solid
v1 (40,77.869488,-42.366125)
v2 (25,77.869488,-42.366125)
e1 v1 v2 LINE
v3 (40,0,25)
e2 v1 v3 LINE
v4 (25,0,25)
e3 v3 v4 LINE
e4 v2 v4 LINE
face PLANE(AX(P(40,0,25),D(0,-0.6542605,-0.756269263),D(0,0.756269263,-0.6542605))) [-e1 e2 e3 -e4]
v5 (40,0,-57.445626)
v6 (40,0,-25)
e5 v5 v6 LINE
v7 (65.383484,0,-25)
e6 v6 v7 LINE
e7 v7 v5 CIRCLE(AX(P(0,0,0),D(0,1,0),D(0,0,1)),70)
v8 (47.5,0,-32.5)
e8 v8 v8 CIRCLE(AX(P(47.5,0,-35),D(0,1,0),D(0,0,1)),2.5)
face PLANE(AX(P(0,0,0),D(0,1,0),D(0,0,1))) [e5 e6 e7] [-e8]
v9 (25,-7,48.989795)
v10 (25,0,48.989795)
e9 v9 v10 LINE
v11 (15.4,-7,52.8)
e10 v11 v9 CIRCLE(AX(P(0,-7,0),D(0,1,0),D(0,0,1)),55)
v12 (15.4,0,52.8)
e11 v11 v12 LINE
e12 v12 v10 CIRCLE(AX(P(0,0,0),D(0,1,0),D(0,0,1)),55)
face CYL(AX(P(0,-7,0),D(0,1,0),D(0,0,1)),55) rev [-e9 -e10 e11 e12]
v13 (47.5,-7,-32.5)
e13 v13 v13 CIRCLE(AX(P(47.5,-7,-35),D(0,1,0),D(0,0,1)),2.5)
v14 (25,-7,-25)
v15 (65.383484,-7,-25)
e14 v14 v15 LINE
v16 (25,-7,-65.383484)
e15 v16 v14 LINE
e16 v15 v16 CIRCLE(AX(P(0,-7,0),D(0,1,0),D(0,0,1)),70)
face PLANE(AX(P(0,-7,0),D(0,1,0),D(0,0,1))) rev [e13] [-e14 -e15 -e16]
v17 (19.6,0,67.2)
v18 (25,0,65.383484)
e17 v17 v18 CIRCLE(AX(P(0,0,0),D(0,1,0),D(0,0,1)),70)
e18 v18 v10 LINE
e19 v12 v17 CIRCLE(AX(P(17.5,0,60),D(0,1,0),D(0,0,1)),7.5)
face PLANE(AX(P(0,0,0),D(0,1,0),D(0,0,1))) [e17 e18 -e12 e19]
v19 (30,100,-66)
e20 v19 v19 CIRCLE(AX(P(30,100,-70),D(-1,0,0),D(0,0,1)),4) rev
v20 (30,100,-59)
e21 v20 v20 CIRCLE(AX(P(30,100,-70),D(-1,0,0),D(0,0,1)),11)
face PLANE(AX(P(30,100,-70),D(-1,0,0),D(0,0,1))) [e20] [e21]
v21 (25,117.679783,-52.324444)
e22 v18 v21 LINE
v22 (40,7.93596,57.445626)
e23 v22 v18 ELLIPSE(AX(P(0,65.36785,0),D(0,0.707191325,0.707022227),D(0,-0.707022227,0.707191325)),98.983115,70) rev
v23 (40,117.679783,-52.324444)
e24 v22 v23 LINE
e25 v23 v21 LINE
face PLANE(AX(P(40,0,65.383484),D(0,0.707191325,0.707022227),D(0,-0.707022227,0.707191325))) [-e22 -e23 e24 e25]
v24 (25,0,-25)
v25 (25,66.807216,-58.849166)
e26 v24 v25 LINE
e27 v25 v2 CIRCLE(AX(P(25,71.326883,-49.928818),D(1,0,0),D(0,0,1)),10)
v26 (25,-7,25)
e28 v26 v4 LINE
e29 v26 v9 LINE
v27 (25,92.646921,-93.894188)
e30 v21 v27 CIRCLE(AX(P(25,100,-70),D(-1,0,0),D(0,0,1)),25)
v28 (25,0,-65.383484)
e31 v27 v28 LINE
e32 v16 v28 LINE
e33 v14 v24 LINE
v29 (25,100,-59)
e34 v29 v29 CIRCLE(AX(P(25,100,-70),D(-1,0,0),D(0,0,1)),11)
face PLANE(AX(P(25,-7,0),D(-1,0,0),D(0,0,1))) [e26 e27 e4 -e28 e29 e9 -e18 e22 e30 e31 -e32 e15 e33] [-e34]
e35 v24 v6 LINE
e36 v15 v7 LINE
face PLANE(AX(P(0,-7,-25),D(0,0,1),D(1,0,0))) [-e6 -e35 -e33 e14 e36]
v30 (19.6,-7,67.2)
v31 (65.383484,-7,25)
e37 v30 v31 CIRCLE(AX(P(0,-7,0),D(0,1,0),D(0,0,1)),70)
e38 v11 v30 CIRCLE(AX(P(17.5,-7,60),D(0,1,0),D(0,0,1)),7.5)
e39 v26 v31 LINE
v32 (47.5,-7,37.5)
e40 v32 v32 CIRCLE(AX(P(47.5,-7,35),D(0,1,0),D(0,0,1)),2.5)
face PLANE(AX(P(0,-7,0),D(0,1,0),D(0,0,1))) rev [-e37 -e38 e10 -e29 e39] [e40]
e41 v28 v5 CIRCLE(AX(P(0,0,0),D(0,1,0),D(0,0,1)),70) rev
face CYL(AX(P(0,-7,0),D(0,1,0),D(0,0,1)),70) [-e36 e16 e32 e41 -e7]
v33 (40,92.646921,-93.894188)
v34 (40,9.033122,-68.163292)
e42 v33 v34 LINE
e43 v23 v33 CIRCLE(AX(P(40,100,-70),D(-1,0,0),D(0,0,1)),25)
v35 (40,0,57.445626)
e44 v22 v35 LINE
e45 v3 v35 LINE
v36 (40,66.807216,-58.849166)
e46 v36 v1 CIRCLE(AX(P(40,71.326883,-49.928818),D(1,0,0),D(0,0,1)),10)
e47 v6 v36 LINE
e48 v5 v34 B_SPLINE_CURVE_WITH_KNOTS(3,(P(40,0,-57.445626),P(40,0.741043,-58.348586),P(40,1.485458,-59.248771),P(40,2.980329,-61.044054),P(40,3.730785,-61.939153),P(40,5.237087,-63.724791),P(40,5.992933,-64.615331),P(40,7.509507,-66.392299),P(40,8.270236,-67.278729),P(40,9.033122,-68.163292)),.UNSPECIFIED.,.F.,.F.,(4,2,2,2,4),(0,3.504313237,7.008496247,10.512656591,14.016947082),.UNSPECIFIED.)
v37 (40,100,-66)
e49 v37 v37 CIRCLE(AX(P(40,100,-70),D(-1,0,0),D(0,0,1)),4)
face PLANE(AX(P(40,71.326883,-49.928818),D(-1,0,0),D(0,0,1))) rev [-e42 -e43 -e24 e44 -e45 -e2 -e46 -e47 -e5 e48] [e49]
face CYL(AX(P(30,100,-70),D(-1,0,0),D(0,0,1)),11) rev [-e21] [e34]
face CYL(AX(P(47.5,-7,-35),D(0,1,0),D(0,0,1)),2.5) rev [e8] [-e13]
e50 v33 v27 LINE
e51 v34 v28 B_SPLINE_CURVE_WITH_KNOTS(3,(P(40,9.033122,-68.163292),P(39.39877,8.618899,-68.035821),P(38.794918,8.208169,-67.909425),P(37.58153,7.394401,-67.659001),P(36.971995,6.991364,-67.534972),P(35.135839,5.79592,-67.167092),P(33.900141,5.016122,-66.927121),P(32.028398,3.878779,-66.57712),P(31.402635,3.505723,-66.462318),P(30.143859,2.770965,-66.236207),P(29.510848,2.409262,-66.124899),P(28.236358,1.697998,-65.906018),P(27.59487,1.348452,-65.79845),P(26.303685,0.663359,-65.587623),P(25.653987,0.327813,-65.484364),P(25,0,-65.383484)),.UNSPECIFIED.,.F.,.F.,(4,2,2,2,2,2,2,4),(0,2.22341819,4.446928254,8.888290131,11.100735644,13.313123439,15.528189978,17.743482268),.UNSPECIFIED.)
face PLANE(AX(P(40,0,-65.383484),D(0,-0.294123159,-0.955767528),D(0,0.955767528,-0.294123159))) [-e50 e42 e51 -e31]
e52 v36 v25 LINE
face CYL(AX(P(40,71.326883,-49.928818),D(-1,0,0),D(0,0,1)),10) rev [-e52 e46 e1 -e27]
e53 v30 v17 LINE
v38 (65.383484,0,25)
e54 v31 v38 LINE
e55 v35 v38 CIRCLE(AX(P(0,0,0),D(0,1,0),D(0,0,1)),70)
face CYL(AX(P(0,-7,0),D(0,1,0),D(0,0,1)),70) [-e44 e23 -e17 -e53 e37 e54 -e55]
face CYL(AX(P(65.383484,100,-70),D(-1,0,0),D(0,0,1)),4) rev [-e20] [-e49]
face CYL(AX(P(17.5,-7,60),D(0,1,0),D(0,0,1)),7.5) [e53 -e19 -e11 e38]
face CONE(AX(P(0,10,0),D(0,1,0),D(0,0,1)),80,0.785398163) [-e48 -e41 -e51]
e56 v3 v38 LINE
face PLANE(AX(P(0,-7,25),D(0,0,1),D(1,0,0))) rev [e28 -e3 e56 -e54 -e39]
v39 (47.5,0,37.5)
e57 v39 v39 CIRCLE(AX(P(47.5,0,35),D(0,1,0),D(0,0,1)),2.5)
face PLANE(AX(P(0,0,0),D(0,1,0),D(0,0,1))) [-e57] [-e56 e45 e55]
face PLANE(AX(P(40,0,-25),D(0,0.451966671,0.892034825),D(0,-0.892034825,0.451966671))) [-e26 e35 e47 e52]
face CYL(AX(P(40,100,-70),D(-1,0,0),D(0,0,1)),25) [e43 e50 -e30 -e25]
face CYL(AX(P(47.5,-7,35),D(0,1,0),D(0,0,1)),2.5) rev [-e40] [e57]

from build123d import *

# Parameters (mm, degrees)
BOSS_EXTRUDE1_DEPTH   = 7
BOSS_EXTRUDE1_2_DEPTH = 7
BOSS_EXTRUDE2_DEPTH   = 15
CUT_EXTRUDE2_START    = 10
SKETCH3_R             = 92.486171345
SKETCH3_R_2           = 70
CUT_EXTRUDE2_DEPTH    = 10
CHAMFER2_SIZE         = 10
SKETCH4_R             = 4
CUT_EXTRUDE3_DEPTH    = 163.113620009
SKETCH5_R             = 11
CUT_EXTRUDE4_DEPTH    = 5
SKETCH6_R             = 2.5
CUT_EXTRUDE5_DEPTH    = 171.073513517
BOSS_EXTRUDE3_DEPTH   = 7


with BuildPart() as part:
    # Sketch1 → Boss-Extrude1 (new body)
    with BuildSketch(Plane(origin=(0, 0, 0), x_dir=(1, 0, 0), z_dir=(0, 1, 0))):
        with BuildLine():
            ThreePointArc((65.383484153, 25), (49.497474683, 49.497474683), (25, 65.383484153))
            Line((25, 65.383484153), (25, 25))
            Line((25, 25), (65.383484153, 25))
        make_face()
    extrude(amount=-BOSS_EXTRUDE1_DEPTH)



with BuildPart() as body_2:
    # Sketch1 → Boss-Extrude1 2 (new body)
    with BuildSketch(Plane(origin=(0, 0, 0), x_dir=(1, 0, 0), z_dir=(0, 1, 0))):
        with BuildLine():
            Line((25, -25), (25, -65.383484153))
            ThreePointArc((25, -65.383484153), (49.497474683, -49.497474683), (65.383484153, -25))
            Line((65.383484153, -25), (25, -25))
        make_face()
    extrude(amount=-BOSS_EXTRUDE1_2_DEPTH)


with BuildPart() as part_1:
    add(part.part)

    add(body_2.part)  # Boss-Extrude2 merges body 2
    # Sketch2 → Boss-Extrude2 (add)
    with BuildSketch(Plane.ZY.offset(-25)):
        with BuildLine():
            Line((-65.383484153, 0), (-93.894188194, 92.646921016))
            ThreePointArc((-93.894188194, 92.646921016), (-82.896855971, 121.416608183), (-52.324444318, 117.679783125))
            Line((-52.324444318, 117.679783125), (65.383484153, 0))
            Line((65.383484153, 0), (25, 0))
            Line((25, 0), (-42.366125313, 77.869487777))
            ThreePointArc((-42.366125313, 77.869487777), (-55.501453858, 79.630239272), (-58.849166194, 66.807216074))
            Line((-58.849166194, 66.807216074), (-25, 0))
            Line((-25, 0), (-65.383484153, 0))
        make_face()
    extrude(amount=-BOSS_EXTRUDE2_DEPTH)

    # Sketch3 → Cut-Extrude2 (cut)
    with BuildSketch(Plane(origin=(0, 0, 0), x_dir=(1, 0, 0), z_dir=(0, 1, 0)).offset(CUT_EXTRUDE2_START)):
        Circle(SKETCH3_R)
        Circle(SKETCH3_R_2, mode=Mode.SUBTRACT)
    extrude(amount=-CUT_EXTRUDE2_DEPTH, mode=Mode.SUBTRACT)

    # Chamfer2
    # the kernel refuses this chamfer: 10 mm, written as the material it adds along each edge
    with BuildSketch(Plane(origin=(0, 10, 0), x_dir=(0.8280566024533268, 0, -0.5606445069145448), z_dir=(0.5606445069145448, 0, 0.8280566024533268))) as chamfer2_piece_1_section:
        Polygon((70 + CHAMFER2_SIZE, 0), (70, -CHAMFER2_SIZE), (70, 0), align=None)
    chamfer2_piece_1 = revolve(axis=Axis((0, 10, 0), (0, 1, 0)), revolution_arc=56.024500162, mode=Mode.PRIVATE)
    chamfer2_piece_1 = split(chamfer2_piece_1, bisect_by=Plane(origin=(33.827146268, 0, -63.755868056), z_dir=(0, 1, 0)), keep=Keep.TOP, mode=Mode.PRIVATE)
    chamfer2_piece_1 = split(chamfer2_piece_1, bisect_by=Plane(origin=(40, 6.324094296, -63.755868056), z_dir=(-1, 0, 0)), keep=Keep.TOP, mode=Mode.PRIVATE)
    chamfer2_piece_1 = split(chamfer2_piece_1, bisect_by=Plane(origin=(33.827146268, 5.319462172, -67.020469063), z_dir=(0, 0.2941231593783912, 0.9557675277583318)), keep=Keep.TOP, mode=Mode.PRIVATE)
    chamfer2_piece_1 = split(chamfer2_piece_1, bisect_by=Plane(origin=(25, 6.324094296, -63.755868056), z_dir=(1, 0, 0)), keep=Keep.TOP, mode=Mode.PRIVATE)
    add(chamfer2_piece_1)

    # Sketch4 → Cut-Extrude3 (cut, through all)
    with BuildSketch(Plane.ZY.offset(-25)):
        with Locations((-70, 100)):
            Circle(SKETCH4_R)
    extrude(amount=-CUT_EXTRUDE3_DEPTH, mode=Mode.SUBTRACT)

    # Sketch5 → Cut-Extrude4 (cut)
    with BuildSketch(Plane.ZY.offset(-25)):
        with Locations((-70, 100)):
            Circle(SKETCH5_R)
    extrude(amount=-CUT_EXTRUDE4_DEPTH, mode=Mode.SUBTRACT)

    # Sketch6 → Cut-Extrude5 (cut, through all)
    with BuildSketch(Plane(origin=(0, 0, 0), x_dir=(1, 0, 0), z_dir=(0, 1, 0))):
        with Locations(Location((47.5, 35, 0), (0, 0, 270))):
            Circle(SKETCH6_R)
        with Locations(Location((47.5, -35, 0), (0, 0, 270))):
            Circle(SKETCH6_R)
    extrude(amount=-CUT_EXTRUDE5_DEPTH, mode=Mode.SUBTRACT)

    # Sketch7 → Boss-Extrude3 (add)
    with BuildSketch(Plane(origin=(0, 0, 0), x_dir=(1, 0, 0), z_dir=(0, 1, 0))):
        with BuildLine():
            Line((25, -65.383484153), (25.1277486, -48.924393203))
            ThreePointArc((25.1277486, -48.924393203), (20.356318028, -51.094229775), (15.4, -52.8))
            ThreePointArc((15.4, -52.8), (10.3, -62.1), (19.6, -67.2))
            ThreePointArc((19.6, -67.2), (22.318488579, -66.346703517), (25, -65.383484153))
        make_face()
    extrude(amount=-BOSS_EXTRUDE3_DEPTH)


solid = part_1.part
